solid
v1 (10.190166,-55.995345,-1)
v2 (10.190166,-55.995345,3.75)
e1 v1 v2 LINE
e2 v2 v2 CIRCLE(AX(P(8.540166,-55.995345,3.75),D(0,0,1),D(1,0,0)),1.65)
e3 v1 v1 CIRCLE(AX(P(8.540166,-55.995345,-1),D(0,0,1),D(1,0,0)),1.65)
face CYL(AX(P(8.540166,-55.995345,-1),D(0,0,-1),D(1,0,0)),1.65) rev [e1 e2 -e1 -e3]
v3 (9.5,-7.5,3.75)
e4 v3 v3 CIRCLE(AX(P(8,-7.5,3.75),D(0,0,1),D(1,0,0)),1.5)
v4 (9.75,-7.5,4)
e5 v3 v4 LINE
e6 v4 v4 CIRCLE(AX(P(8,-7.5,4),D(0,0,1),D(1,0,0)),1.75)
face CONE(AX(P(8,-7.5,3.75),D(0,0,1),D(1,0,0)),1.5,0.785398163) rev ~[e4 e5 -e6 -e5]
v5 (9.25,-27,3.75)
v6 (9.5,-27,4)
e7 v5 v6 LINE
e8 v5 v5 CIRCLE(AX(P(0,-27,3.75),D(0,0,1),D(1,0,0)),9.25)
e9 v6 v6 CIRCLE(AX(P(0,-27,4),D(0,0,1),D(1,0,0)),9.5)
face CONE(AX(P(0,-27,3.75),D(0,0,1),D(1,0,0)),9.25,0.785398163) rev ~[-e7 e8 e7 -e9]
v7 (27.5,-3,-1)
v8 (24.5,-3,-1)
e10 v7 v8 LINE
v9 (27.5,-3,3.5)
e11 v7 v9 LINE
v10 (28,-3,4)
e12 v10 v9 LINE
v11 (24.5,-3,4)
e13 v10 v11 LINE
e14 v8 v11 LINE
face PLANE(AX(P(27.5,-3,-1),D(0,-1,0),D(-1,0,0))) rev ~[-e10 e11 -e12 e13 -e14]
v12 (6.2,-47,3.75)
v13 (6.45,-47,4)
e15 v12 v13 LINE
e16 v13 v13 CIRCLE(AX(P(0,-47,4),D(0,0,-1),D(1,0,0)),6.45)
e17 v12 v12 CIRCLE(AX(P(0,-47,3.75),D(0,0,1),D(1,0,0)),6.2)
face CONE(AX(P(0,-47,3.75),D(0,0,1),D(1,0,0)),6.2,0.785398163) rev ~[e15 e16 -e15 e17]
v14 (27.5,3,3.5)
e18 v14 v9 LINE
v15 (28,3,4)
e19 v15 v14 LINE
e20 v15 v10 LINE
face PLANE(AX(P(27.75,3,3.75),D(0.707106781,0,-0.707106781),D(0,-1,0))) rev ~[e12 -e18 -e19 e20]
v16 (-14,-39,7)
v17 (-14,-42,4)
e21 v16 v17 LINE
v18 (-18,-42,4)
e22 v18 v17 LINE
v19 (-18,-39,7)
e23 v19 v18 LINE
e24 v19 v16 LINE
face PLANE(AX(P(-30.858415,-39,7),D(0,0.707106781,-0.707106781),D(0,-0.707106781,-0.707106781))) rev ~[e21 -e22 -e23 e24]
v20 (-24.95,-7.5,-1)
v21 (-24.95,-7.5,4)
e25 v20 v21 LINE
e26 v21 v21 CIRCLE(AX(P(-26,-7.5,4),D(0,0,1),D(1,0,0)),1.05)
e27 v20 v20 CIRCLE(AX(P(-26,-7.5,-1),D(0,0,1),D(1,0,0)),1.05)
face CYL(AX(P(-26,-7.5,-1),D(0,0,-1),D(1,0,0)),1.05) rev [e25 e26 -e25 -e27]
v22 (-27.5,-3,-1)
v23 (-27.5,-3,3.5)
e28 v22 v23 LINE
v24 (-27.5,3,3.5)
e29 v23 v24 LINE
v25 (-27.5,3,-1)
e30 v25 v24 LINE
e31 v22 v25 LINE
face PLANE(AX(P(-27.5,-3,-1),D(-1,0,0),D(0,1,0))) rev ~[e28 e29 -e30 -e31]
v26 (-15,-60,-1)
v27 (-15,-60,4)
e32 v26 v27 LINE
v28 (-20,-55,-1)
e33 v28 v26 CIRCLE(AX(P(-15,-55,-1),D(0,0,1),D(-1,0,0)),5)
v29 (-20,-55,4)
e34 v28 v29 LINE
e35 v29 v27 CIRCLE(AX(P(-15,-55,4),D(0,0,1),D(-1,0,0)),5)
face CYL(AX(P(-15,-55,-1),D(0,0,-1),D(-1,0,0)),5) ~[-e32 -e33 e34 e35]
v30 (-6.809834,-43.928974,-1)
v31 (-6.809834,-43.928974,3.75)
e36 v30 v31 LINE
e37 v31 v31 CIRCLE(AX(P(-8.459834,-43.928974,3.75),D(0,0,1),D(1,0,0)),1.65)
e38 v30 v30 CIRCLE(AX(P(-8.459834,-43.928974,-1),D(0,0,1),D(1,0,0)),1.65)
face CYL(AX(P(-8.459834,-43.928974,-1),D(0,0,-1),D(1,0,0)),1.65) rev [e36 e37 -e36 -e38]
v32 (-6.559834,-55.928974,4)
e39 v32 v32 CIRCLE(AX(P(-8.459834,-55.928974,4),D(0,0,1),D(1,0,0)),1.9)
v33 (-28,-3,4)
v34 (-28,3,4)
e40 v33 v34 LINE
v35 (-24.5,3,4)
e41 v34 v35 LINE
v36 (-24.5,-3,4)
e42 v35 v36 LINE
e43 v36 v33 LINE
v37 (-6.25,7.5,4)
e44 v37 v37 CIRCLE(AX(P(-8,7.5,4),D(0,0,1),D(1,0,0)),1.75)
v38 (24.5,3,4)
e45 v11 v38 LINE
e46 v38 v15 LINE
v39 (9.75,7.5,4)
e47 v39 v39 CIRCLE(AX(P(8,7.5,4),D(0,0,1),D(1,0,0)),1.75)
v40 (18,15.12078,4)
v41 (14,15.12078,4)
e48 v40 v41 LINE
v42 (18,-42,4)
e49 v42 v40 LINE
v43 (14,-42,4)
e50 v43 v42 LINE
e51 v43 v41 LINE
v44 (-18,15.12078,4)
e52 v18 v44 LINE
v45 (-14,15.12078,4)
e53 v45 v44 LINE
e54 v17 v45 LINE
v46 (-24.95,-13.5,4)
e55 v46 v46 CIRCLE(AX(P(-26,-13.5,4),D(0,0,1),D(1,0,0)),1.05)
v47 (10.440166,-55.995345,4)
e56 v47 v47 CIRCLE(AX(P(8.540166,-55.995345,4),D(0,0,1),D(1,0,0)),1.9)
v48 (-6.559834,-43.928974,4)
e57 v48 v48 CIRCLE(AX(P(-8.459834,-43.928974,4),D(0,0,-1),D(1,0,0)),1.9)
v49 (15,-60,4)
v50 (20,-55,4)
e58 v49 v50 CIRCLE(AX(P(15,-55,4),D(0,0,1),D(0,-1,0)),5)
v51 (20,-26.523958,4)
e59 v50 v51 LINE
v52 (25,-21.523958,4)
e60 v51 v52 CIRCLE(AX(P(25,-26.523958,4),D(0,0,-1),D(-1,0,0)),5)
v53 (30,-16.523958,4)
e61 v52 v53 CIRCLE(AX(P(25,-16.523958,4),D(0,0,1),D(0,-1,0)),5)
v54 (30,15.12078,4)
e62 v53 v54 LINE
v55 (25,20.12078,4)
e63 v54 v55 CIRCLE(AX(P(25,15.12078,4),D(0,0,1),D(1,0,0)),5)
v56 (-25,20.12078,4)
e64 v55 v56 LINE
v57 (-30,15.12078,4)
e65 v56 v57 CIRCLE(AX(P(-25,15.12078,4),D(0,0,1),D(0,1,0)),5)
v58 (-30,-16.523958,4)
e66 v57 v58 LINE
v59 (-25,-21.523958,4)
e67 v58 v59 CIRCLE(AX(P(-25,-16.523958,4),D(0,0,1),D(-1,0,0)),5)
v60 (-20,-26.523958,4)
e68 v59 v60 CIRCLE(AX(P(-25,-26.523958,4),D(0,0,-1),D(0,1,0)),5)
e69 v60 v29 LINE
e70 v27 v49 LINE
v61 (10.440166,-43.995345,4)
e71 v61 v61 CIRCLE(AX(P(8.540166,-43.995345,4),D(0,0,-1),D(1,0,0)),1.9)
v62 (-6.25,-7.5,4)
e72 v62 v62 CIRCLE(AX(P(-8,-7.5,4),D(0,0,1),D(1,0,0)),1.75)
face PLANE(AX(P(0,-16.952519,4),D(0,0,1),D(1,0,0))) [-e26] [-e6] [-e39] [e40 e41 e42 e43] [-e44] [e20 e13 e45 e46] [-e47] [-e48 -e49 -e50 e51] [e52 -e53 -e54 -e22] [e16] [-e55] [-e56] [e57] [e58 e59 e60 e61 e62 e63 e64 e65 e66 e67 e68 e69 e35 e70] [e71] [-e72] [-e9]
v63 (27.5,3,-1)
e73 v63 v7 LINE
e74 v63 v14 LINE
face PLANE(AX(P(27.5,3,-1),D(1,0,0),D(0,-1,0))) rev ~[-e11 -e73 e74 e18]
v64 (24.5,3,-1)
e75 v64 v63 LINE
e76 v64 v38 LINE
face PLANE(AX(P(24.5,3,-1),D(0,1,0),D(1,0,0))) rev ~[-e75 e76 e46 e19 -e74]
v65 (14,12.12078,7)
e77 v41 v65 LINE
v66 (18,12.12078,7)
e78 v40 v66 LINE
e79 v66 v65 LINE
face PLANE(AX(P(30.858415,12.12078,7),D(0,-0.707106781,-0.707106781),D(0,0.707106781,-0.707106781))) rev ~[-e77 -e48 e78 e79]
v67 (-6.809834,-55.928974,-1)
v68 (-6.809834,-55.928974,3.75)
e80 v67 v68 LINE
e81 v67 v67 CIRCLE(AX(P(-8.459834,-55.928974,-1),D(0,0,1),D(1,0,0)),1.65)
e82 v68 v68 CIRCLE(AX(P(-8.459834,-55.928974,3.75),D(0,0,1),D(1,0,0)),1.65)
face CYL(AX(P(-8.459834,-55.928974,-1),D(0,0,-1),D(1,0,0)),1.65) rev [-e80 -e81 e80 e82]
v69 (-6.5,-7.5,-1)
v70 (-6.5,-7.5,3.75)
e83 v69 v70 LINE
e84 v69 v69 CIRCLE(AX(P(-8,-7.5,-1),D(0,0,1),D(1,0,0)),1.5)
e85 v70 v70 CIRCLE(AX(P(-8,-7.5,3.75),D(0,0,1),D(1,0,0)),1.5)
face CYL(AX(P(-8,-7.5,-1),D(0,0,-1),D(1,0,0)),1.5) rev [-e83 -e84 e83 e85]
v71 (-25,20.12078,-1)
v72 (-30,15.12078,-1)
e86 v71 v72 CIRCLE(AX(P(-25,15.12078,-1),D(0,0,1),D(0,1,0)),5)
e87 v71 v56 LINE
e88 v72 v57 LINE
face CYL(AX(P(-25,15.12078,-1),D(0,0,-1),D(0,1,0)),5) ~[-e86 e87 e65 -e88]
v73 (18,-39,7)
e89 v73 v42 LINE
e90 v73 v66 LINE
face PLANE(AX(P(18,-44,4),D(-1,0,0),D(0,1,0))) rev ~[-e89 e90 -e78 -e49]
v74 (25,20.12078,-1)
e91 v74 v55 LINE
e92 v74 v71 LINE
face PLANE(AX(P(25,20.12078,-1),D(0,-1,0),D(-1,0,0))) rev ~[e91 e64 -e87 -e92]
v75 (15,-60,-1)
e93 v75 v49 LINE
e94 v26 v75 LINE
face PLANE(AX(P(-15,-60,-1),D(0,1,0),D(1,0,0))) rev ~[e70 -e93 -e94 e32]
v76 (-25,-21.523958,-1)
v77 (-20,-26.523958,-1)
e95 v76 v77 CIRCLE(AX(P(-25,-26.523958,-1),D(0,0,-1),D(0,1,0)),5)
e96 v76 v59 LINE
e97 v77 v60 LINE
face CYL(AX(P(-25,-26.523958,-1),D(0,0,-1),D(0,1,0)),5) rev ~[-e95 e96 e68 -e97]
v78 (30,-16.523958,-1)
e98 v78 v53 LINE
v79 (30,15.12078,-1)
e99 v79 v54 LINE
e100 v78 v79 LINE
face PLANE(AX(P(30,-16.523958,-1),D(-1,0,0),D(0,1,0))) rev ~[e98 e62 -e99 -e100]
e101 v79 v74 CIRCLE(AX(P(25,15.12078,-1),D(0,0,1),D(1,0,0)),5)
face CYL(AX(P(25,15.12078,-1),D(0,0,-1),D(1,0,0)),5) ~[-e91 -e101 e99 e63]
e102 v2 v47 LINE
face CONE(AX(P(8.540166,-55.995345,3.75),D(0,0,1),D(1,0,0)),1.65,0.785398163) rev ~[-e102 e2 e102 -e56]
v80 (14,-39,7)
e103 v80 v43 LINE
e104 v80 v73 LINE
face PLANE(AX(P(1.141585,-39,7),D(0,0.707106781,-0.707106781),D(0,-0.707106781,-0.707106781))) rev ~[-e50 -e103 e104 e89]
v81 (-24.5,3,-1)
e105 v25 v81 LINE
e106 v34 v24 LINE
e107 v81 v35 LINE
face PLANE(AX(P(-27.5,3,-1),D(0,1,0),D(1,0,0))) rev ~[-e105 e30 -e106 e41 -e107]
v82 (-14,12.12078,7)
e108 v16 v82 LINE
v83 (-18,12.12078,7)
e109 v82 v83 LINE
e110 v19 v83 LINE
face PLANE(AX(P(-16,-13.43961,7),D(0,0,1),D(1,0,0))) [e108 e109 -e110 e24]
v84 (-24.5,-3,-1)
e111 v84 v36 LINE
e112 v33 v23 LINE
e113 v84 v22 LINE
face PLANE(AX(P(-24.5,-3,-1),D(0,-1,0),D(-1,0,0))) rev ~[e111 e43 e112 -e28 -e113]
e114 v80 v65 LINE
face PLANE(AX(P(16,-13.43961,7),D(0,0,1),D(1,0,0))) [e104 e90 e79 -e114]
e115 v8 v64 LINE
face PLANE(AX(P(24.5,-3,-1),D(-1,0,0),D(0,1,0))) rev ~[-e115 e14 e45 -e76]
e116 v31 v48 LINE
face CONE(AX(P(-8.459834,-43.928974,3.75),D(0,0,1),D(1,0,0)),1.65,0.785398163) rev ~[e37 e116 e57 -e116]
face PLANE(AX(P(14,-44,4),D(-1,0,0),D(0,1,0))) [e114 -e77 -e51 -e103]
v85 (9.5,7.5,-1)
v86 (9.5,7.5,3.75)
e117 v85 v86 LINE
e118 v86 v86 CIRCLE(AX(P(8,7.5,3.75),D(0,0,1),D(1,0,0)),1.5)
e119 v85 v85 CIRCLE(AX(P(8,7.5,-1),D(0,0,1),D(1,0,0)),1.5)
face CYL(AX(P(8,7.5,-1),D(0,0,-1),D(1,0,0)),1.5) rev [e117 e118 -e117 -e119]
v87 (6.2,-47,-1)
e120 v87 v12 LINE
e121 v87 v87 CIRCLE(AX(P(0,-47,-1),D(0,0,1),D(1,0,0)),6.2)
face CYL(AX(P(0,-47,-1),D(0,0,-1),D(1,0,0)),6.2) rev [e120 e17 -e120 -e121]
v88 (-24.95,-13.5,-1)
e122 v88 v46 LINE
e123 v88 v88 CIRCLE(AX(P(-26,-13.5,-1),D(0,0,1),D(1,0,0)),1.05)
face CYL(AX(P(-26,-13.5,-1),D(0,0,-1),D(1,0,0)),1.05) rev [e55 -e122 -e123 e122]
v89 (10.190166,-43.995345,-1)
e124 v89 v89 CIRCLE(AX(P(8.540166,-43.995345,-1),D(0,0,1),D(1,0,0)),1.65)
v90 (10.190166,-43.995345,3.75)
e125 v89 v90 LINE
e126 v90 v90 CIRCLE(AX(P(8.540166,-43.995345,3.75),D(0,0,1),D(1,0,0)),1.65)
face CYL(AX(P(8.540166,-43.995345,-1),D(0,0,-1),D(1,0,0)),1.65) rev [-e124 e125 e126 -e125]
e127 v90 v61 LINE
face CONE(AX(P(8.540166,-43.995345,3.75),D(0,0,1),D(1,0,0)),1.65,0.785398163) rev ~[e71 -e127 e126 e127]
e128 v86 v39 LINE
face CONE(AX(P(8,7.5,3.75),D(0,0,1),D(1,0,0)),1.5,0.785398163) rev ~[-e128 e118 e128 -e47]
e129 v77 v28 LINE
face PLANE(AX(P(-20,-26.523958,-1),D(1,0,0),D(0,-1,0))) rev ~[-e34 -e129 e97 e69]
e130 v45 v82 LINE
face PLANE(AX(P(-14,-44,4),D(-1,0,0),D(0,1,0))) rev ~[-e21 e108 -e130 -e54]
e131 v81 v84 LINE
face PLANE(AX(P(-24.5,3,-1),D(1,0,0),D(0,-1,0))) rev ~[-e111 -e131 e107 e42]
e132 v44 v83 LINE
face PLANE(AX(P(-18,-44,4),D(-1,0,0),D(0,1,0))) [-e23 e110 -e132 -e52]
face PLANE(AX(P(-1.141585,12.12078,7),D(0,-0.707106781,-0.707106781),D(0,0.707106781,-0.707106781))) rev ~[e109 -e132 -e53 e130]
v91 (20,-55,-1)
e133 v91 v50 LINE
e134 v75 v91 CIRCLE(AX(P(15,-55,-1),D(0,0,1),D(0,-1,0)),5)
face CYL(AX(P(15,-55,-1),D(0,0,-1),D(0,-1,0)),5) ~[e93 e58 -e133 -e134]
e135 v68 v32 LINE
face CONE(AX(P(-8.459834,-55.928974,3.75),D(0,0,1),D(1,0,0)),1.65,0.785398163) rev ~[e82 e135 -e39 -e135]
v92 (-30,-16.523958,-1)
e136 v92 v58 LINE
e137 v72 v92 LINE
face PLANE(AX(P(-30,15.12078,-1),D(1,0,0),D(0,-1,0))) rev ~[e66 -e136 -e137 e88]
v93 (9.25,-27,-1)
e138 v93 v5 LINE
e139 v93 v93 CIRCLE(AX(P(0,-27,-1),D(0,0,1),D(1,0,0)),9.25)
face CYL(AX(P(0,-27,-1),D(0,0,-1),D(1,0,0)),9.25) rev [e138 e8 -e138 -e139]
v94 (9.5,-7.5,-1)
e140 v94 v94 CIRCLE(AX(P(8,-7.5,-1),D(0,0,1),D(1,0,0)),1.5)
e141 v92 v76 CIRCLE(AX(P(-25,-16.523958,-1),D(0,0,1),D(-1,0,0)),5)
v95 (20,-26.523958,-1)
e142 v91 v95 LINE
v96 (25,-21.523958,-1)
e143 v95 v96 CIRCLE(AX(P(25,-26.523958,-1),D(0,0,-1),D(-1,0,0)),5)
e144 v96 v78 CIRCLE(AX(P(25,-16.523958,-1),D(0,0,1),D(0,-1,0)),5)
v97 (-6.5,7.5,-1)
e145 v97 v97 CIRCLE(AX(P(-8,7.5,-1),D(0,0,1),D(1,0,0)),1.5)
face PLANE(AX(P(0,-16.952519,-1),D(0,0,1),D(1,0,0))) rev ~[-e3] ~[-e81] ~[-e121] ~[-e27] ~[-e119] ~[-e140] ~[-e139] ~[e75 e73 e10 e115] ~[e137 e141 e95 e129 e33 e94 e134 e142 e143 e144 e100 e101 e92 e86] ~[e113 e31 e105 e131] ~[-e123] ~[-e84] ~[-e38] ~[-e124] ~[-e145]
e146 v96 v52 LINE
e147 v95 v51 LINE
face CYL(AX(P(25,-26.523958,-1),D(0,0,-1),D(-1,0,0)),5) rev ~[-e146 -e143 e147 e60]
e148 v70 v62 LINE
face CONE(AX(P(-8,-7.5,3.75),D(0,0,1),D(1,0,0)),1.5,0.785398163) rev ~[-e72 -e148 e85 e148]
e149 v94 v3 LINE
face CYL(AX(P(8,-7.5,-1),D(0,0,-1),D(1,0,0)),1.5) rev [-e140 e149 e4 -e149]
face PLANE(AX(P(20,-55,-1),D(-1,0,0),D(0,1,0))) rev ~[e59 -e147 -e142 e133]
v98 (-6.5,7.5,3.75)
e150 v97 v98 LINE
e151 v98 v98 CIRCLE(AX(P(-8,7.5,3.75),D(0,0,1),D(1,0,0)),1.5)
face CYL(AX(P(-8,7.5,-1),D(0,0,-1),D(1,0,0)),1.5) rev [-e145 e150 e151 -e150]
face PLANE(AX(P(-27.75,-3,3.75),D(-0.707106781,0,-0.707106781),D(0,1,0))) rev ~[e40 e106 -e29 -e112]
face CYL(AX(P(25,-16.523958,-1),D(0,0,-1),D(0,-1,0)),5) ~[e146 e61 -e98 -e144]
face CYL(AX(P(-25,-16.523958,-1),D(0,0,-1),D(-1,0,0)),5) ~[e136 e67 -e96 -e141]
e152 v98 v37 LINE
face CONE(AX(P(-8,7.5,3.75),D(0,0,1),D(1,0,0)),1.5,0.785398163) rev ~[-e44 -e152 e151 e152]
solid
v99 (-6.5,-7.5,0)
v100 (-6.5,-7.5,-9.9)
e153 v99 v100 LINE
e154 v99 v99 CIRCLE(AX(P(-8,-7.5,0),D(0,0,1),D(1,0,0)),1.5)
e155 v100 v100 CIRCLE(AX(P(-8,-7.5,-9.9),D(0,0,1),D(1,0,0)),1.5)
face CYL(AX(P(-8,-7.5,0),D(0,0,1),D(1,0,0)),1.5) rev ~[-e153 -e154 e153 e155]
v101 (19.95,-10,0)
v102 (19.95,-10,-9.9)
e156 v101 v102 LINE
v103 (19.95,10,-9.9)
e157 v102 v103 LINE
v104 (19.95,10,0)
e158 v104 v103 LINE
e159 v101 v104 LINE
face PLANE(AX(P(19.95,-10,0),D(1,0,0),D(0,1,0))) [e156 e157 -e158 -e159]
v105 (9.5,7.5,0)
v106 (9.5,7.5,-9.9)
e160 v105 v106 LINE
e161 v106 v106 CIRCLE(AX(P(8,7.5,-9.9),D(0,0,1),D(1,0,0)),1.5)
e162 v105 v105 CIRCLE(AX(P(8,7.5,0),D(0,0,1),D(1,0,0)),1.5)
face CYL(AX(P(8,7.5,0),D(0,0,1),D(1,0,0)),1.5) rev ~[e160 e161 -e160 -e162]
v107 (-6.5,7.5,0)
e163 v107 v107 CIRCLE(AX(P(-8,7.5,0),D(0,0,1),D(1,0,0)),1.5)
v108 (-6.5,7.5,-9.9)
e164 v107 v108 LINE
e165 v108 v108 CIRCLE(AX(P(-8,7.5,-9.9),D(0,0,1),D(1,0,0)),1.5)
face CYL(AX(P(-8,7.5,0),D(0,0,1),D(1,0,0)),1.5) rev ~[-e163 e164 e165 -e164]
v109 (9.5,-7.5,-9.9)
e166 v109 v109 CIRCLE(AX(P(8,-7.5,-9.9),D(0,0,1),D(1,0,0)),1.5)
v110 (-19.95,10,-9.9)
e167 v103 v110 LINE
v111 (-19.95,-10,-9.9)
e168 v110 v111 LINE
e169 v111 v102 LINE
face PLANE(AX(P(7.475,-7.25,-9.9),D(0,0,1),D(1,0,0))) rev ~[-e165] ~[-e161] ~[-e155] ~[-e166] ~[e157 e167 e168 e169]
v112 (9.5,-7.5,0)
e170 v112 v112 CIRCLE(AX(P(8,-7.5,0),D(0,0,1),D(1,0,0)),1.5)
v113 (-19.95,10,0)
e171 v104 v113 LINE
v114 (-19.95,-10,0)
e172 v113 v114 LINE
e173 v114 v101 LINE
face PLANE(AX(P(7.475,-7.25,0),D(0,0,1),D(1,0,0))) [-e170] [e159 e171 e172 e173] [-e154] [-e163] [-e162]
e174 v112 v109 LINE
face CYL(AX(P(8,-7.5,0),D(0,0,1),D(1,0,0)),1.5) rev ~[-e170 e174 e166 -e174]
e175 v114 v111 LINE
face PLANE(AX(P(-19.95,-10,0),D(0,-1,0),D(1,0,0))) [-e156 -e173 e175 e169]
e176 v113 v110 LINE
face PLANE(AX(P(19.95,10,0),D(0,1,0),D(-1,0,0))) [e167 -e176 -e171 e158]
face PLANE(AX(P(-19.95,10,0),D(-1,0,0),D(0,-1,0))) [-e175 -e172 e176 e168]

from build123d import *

# Parameters (mm, degrees)
F0_W         = 14.95
F0_H         = 5.5
F0_R         = 1.5
F0_H_2       = 4.5
F1_DEPTH     = 9.9
F3_R         = 1.65
F3_R_2       = 6.2
F3_R_3       = 9.25
F3_R_4       = 1.05
F3_R_5       = 1.5
F4_DEPTH     = 5
F5_SIZE2     = 0.25
F5_SIZE      = 0.25
F6_SIZE      = 0.5
F7_W         = 4
F7_H         = 61.1207796717
F8_DEPTH     = 3
F9_T4_DEPTH  = 29.7168298797
F9_T9_DEPTH  = 29.7168298797
F9_T14_DEPTH = 29.7168298797
F9_T19_DEPTH = 29.7168298797


# Not quite as in the source:
# - a fillet or chamfer that OpenCascade refuses, or shapes differently, is made with other operations: its cross-section is extruded or revolved along the edge and cut away or added


with BuildPart() as f1:
    # F0 (on Top) → F1 (new body)
    with BuildSketch(Plane.XY):
        with Locations((7.475, -7.25)):
            Rectangle(F0_W, F0_H)
        with Locations((8, -7.5)):
            Circle(F0_R, mode=Mode.SUBTRACT)
        with Locations((-7.475, -2.25)):
            Rectangle(F0_W, F0_H_2)
        Polygon((-19.95, 0), (-14.95, 0), (-14.95, 4.5), (-14.95, 10), (-19.95, 10), align=None)
        Polygon((-14.95, -4.5), (-14.95, 0), (-19.95, 0), (-19.95, -10), (-14.95, -10), align=None)
        Polygon((14.95, 4.5), (14.95, 0), (19.95, 0), (19.95, 10), (14.95, 10), align=None)
        Polygon((19.95, 0), (14.95, 0), (14.95, -4.5), (14.95, -10), (19.95, -10), align=None)
        with Locations((-7.475, -7.25)):
            Rectangle(F0_W, F0_H)
        with Locations((-8, -7.5)):
            Circle(F0_R, mode=Mode.SUBTRACT)
        with Locations((-7.475, 2.25)):
            Rectangle(F0_W, F0_H_2)
        with Locations((7.475, -2.25)):
            Rectangle(F0_W, F0_H_2)
        with Locations((7.475, 2.25)):
            Rectangle(F0_W, F0_H_2)
        with Locations((7.475, 7.25)):
            Rectangle(F0_W, F0_H)
        with Locations((8, 7.5)):
            Circle(F0_R, mode=Mode.SUBTRACT)
        with Locations((-7.475, 7.25)):
            Rectangle(F0_W, F0_H)
        with Locations((-8, 7.5)):
            Circle(F0_R, mode=Mode.SUBTRACT)
    extrude(amount=-F1_DEPTH)


with BuildPart() as f4:
    # F3 (on offset) → F4 (new body)
    with BuildSketch(Plane.XY.offset(-1)):
        with BuildLine():
            Line((25, 20.1207796717), (0, 20.1207796717))
            Line((0, 20.1207796717), (-25, 20.1207796717))
            ThreePointArc((-25, 20.1207796717), (-28.5355339059, 18.6563135776), (-30, 15.1207796717))
            Line((-30, 15.1207796717), (-30, -16.523957546))
            ThreePointArc((-30, -16.523957546), (-28.5355339059, -20.0594914519), (-25, -21.523957546))
            ThreePointArc((-25, -21.523957546), (-21.4644660941, -22.9884236401), (-20, -26.523957546))
            Line((-20, -26.523957546), (-20, -55))
            ThreePointArc((-20, -55), (-18.5355339059, -58.5355339059), (-15, -60))
            Line((-15, -60), (0, -60))
            Line((0, -60), (15, -60))
            ThreePointArc((15, -60), (18.5355339059, -58.5355339059), (20, -55))
            Line((20, -55), (20, -26.523957546))
            ThreePointArc((20, -26.523957546), (21.4644660941, -22.9884236401), (25, -21.523957546))
            ThreePointArc((25, -21.523957546), (28.5355339059, -20.0594914519), (30, -16.523957546))
            Line((30, -16.523957546), (30, 15.1207796717))
            ThreePointArc((30, 15.1207796717), (28.5355339059, 18.6563135776), (25, 20.1207796717))
        make_face()
        with Locations((-8.4598344365, -55.9289738999)):
            Circle(F3_R, mode=Mode.SUBTRACT)
        with Locations((-8.4598344365, -43.9289738999)):
            Circle(F3_R, mode=Mode.SUBTRACT)
        with Locations((8.5401655635, -55.9953450549)):
            Circle(F3_R, mode=Mode.SUBTRACT)
        with Locations((0, -47)):
            Circle(F3_R_2, mode=Mode.SUBTRACT)
        with Locations((8.5401655635, -43.9953450549)):
            Circle(F3_R, mode=Mode.SUBTRACT)
        with Locations((0, -27)):
            Circle(F3_R_3, mode=Mode.SUBTRACT)
        with Locations((-26, -13.5)):
            Circle(F3_R_4, mode=Mode.SUBTRACT)
        with Locations((-26, -7.5)):
            Circle(F3_R_4, mode=Mode.SUBTRACT)
        Polygon((-27.5, -3), (-27.5, 0), (-27.5, 3), (-24.5, 3), (-24.5, 0), (-24.5, -3), align=None, mode=Mode.SUBTRACT)
        with Locations((-8, -7.5)):
            Circle(F3_R_5, mode=Mode.SUBTRACT)
        with Locations((-8, 7.5)):
            Circle(F3_R_5, mode=Mode.SUBTRACT)
        with Locations((8, -7.5)):
            Circle(F3_R_5, mode=Mode.SUBTRACT)
        Polygon((24.5, 0), (24.5, 3), (27.5, 3), (27.5, 0), (27.5, -3), (24.5, -3), align=None, mode=Mode.SUBTRACT)
        with Locations((8, 7.5)):
            Circle(F3_R_5, mode=Mode.SUBTRACT)
    extrude(amount=F4_DEPTH)

    # F5
    f5_edges = [f4.edges().sort_by_distance(p)[0] for p in [
        (6.5, -7.5, 4),
        (6.5, 7.5, 4),
        (-9.5, 7.5, 4),
        (-9.5, -7.5, 4),
        (-10.109834, -43.928974, 4),
        (6.890166, -43.995345, 4),
        (6.890166, -55.995345, 4),
        (-10.109834, -55.928974, 4),
        (-6.2, -47, 4),
        (-9.25, -27, 4),
    ]]
    chamfer(f5_edges, length=F5_SIZE, length2=F5_SIZE2)

    # F6
    f6_edges = [f4.edges().sort_by_distance(p)[0] for p in [
        (-27.5, 0, 4),
        (27.5, 0, 4),
    ]]
    chamfer(f6_edges, length=F6_SIZE)

    # F7 (on face) → F8 (join)
    with BuildSketch(Plane.XY.offset(4)):
        with Locations((-16, -13.4396101642)):
            Rectangle(F7_W, F7_H)
        with Locations((16, -13.4396101642)):
            Rectangle(F7_W, F7_H)
    extrude(amount=F8_DEPTH)

    # F9: chamfer of 5 on 4 edges, made by hand


with BuildPart() as f9_tool2:
    # F9_s3 → F9_t4 (new body)
    with BuildSketch(Plane.YZ.offset(-30.8584149398)):
        Polygon((-39, 7), (-44, 2), (-44, 7), align=None)
    extrude(amount=F9_T4_DEPTH)

    split(bisect_by=Plane.XY.offset(4), keep=Keep.TOP)


with BuildPart() as f4_1:
    add(f4.part)

    # F9_t1: cut F9_tool2
    add(f9_tool2.part, mode=Mode.SUBTRACT)


with BuildPart() as f9_tool7:
    # F9_s8 → F9_t9 (new body)
    with BuildSketch(Plane.YZ.offset(1.1415850602)):
        Polygon((-39, 7), (-44, 2), (-44, 7), align=None)
    extrude(amount=F9_T9_DEPTH)

    split(bisect_by=Plane.XY.offset(4), keep=Keep.TOP)


with BuildPart() as f4_2:
    add(f4_1.part)

    # F9_t6: cut F9_tool7
    add(f9_tool7.part, mode=Mode.SUBTRACT)


with BuildPart() as f9_tool12:
    # F9_s13 → F9_t14 (new body)
    with BuildSketch(Plane.YZ.offset(-1.1415850602)):
        Polygon((12.1207796717, 7), (17.1207796717, 2), (17.1207796717, 7), align=None)
    extrude(amount=-F9_T14_DEPTH)

    split(bisect_by=Plane.XY.offset(4), keep=Keep.TOP)


with BuildPart() as f4_3:
    add(f4_2.part)

    # F9_t11: cut F9_tool12
    add(f9_tool12.part, mode=Mode.SUBTRACT)


with BuildPart() as f9_tool17:
    # F9_s18 → F9_t19 (new body)
    with BuildSketch(Plane.YZ.offset(30.8584149398)):
        Polygon((12.1207796717, 7), (17.1207796717, 2), (17.1207796717, 7), align=None)
    extrude(amount=-F9_T19_DEPTH)

    split(bisect_by=Plane.XY.offset(4), keep=Keep.TOP)


with BuildPart() as f4_4:
    add(f4_3.part)

    # F9_t16: cut F9_tool17
    add(f9_tool17.part, mode=Mode.SUBTRACT)


solid = Compound([f1.part, f4_4.part])
